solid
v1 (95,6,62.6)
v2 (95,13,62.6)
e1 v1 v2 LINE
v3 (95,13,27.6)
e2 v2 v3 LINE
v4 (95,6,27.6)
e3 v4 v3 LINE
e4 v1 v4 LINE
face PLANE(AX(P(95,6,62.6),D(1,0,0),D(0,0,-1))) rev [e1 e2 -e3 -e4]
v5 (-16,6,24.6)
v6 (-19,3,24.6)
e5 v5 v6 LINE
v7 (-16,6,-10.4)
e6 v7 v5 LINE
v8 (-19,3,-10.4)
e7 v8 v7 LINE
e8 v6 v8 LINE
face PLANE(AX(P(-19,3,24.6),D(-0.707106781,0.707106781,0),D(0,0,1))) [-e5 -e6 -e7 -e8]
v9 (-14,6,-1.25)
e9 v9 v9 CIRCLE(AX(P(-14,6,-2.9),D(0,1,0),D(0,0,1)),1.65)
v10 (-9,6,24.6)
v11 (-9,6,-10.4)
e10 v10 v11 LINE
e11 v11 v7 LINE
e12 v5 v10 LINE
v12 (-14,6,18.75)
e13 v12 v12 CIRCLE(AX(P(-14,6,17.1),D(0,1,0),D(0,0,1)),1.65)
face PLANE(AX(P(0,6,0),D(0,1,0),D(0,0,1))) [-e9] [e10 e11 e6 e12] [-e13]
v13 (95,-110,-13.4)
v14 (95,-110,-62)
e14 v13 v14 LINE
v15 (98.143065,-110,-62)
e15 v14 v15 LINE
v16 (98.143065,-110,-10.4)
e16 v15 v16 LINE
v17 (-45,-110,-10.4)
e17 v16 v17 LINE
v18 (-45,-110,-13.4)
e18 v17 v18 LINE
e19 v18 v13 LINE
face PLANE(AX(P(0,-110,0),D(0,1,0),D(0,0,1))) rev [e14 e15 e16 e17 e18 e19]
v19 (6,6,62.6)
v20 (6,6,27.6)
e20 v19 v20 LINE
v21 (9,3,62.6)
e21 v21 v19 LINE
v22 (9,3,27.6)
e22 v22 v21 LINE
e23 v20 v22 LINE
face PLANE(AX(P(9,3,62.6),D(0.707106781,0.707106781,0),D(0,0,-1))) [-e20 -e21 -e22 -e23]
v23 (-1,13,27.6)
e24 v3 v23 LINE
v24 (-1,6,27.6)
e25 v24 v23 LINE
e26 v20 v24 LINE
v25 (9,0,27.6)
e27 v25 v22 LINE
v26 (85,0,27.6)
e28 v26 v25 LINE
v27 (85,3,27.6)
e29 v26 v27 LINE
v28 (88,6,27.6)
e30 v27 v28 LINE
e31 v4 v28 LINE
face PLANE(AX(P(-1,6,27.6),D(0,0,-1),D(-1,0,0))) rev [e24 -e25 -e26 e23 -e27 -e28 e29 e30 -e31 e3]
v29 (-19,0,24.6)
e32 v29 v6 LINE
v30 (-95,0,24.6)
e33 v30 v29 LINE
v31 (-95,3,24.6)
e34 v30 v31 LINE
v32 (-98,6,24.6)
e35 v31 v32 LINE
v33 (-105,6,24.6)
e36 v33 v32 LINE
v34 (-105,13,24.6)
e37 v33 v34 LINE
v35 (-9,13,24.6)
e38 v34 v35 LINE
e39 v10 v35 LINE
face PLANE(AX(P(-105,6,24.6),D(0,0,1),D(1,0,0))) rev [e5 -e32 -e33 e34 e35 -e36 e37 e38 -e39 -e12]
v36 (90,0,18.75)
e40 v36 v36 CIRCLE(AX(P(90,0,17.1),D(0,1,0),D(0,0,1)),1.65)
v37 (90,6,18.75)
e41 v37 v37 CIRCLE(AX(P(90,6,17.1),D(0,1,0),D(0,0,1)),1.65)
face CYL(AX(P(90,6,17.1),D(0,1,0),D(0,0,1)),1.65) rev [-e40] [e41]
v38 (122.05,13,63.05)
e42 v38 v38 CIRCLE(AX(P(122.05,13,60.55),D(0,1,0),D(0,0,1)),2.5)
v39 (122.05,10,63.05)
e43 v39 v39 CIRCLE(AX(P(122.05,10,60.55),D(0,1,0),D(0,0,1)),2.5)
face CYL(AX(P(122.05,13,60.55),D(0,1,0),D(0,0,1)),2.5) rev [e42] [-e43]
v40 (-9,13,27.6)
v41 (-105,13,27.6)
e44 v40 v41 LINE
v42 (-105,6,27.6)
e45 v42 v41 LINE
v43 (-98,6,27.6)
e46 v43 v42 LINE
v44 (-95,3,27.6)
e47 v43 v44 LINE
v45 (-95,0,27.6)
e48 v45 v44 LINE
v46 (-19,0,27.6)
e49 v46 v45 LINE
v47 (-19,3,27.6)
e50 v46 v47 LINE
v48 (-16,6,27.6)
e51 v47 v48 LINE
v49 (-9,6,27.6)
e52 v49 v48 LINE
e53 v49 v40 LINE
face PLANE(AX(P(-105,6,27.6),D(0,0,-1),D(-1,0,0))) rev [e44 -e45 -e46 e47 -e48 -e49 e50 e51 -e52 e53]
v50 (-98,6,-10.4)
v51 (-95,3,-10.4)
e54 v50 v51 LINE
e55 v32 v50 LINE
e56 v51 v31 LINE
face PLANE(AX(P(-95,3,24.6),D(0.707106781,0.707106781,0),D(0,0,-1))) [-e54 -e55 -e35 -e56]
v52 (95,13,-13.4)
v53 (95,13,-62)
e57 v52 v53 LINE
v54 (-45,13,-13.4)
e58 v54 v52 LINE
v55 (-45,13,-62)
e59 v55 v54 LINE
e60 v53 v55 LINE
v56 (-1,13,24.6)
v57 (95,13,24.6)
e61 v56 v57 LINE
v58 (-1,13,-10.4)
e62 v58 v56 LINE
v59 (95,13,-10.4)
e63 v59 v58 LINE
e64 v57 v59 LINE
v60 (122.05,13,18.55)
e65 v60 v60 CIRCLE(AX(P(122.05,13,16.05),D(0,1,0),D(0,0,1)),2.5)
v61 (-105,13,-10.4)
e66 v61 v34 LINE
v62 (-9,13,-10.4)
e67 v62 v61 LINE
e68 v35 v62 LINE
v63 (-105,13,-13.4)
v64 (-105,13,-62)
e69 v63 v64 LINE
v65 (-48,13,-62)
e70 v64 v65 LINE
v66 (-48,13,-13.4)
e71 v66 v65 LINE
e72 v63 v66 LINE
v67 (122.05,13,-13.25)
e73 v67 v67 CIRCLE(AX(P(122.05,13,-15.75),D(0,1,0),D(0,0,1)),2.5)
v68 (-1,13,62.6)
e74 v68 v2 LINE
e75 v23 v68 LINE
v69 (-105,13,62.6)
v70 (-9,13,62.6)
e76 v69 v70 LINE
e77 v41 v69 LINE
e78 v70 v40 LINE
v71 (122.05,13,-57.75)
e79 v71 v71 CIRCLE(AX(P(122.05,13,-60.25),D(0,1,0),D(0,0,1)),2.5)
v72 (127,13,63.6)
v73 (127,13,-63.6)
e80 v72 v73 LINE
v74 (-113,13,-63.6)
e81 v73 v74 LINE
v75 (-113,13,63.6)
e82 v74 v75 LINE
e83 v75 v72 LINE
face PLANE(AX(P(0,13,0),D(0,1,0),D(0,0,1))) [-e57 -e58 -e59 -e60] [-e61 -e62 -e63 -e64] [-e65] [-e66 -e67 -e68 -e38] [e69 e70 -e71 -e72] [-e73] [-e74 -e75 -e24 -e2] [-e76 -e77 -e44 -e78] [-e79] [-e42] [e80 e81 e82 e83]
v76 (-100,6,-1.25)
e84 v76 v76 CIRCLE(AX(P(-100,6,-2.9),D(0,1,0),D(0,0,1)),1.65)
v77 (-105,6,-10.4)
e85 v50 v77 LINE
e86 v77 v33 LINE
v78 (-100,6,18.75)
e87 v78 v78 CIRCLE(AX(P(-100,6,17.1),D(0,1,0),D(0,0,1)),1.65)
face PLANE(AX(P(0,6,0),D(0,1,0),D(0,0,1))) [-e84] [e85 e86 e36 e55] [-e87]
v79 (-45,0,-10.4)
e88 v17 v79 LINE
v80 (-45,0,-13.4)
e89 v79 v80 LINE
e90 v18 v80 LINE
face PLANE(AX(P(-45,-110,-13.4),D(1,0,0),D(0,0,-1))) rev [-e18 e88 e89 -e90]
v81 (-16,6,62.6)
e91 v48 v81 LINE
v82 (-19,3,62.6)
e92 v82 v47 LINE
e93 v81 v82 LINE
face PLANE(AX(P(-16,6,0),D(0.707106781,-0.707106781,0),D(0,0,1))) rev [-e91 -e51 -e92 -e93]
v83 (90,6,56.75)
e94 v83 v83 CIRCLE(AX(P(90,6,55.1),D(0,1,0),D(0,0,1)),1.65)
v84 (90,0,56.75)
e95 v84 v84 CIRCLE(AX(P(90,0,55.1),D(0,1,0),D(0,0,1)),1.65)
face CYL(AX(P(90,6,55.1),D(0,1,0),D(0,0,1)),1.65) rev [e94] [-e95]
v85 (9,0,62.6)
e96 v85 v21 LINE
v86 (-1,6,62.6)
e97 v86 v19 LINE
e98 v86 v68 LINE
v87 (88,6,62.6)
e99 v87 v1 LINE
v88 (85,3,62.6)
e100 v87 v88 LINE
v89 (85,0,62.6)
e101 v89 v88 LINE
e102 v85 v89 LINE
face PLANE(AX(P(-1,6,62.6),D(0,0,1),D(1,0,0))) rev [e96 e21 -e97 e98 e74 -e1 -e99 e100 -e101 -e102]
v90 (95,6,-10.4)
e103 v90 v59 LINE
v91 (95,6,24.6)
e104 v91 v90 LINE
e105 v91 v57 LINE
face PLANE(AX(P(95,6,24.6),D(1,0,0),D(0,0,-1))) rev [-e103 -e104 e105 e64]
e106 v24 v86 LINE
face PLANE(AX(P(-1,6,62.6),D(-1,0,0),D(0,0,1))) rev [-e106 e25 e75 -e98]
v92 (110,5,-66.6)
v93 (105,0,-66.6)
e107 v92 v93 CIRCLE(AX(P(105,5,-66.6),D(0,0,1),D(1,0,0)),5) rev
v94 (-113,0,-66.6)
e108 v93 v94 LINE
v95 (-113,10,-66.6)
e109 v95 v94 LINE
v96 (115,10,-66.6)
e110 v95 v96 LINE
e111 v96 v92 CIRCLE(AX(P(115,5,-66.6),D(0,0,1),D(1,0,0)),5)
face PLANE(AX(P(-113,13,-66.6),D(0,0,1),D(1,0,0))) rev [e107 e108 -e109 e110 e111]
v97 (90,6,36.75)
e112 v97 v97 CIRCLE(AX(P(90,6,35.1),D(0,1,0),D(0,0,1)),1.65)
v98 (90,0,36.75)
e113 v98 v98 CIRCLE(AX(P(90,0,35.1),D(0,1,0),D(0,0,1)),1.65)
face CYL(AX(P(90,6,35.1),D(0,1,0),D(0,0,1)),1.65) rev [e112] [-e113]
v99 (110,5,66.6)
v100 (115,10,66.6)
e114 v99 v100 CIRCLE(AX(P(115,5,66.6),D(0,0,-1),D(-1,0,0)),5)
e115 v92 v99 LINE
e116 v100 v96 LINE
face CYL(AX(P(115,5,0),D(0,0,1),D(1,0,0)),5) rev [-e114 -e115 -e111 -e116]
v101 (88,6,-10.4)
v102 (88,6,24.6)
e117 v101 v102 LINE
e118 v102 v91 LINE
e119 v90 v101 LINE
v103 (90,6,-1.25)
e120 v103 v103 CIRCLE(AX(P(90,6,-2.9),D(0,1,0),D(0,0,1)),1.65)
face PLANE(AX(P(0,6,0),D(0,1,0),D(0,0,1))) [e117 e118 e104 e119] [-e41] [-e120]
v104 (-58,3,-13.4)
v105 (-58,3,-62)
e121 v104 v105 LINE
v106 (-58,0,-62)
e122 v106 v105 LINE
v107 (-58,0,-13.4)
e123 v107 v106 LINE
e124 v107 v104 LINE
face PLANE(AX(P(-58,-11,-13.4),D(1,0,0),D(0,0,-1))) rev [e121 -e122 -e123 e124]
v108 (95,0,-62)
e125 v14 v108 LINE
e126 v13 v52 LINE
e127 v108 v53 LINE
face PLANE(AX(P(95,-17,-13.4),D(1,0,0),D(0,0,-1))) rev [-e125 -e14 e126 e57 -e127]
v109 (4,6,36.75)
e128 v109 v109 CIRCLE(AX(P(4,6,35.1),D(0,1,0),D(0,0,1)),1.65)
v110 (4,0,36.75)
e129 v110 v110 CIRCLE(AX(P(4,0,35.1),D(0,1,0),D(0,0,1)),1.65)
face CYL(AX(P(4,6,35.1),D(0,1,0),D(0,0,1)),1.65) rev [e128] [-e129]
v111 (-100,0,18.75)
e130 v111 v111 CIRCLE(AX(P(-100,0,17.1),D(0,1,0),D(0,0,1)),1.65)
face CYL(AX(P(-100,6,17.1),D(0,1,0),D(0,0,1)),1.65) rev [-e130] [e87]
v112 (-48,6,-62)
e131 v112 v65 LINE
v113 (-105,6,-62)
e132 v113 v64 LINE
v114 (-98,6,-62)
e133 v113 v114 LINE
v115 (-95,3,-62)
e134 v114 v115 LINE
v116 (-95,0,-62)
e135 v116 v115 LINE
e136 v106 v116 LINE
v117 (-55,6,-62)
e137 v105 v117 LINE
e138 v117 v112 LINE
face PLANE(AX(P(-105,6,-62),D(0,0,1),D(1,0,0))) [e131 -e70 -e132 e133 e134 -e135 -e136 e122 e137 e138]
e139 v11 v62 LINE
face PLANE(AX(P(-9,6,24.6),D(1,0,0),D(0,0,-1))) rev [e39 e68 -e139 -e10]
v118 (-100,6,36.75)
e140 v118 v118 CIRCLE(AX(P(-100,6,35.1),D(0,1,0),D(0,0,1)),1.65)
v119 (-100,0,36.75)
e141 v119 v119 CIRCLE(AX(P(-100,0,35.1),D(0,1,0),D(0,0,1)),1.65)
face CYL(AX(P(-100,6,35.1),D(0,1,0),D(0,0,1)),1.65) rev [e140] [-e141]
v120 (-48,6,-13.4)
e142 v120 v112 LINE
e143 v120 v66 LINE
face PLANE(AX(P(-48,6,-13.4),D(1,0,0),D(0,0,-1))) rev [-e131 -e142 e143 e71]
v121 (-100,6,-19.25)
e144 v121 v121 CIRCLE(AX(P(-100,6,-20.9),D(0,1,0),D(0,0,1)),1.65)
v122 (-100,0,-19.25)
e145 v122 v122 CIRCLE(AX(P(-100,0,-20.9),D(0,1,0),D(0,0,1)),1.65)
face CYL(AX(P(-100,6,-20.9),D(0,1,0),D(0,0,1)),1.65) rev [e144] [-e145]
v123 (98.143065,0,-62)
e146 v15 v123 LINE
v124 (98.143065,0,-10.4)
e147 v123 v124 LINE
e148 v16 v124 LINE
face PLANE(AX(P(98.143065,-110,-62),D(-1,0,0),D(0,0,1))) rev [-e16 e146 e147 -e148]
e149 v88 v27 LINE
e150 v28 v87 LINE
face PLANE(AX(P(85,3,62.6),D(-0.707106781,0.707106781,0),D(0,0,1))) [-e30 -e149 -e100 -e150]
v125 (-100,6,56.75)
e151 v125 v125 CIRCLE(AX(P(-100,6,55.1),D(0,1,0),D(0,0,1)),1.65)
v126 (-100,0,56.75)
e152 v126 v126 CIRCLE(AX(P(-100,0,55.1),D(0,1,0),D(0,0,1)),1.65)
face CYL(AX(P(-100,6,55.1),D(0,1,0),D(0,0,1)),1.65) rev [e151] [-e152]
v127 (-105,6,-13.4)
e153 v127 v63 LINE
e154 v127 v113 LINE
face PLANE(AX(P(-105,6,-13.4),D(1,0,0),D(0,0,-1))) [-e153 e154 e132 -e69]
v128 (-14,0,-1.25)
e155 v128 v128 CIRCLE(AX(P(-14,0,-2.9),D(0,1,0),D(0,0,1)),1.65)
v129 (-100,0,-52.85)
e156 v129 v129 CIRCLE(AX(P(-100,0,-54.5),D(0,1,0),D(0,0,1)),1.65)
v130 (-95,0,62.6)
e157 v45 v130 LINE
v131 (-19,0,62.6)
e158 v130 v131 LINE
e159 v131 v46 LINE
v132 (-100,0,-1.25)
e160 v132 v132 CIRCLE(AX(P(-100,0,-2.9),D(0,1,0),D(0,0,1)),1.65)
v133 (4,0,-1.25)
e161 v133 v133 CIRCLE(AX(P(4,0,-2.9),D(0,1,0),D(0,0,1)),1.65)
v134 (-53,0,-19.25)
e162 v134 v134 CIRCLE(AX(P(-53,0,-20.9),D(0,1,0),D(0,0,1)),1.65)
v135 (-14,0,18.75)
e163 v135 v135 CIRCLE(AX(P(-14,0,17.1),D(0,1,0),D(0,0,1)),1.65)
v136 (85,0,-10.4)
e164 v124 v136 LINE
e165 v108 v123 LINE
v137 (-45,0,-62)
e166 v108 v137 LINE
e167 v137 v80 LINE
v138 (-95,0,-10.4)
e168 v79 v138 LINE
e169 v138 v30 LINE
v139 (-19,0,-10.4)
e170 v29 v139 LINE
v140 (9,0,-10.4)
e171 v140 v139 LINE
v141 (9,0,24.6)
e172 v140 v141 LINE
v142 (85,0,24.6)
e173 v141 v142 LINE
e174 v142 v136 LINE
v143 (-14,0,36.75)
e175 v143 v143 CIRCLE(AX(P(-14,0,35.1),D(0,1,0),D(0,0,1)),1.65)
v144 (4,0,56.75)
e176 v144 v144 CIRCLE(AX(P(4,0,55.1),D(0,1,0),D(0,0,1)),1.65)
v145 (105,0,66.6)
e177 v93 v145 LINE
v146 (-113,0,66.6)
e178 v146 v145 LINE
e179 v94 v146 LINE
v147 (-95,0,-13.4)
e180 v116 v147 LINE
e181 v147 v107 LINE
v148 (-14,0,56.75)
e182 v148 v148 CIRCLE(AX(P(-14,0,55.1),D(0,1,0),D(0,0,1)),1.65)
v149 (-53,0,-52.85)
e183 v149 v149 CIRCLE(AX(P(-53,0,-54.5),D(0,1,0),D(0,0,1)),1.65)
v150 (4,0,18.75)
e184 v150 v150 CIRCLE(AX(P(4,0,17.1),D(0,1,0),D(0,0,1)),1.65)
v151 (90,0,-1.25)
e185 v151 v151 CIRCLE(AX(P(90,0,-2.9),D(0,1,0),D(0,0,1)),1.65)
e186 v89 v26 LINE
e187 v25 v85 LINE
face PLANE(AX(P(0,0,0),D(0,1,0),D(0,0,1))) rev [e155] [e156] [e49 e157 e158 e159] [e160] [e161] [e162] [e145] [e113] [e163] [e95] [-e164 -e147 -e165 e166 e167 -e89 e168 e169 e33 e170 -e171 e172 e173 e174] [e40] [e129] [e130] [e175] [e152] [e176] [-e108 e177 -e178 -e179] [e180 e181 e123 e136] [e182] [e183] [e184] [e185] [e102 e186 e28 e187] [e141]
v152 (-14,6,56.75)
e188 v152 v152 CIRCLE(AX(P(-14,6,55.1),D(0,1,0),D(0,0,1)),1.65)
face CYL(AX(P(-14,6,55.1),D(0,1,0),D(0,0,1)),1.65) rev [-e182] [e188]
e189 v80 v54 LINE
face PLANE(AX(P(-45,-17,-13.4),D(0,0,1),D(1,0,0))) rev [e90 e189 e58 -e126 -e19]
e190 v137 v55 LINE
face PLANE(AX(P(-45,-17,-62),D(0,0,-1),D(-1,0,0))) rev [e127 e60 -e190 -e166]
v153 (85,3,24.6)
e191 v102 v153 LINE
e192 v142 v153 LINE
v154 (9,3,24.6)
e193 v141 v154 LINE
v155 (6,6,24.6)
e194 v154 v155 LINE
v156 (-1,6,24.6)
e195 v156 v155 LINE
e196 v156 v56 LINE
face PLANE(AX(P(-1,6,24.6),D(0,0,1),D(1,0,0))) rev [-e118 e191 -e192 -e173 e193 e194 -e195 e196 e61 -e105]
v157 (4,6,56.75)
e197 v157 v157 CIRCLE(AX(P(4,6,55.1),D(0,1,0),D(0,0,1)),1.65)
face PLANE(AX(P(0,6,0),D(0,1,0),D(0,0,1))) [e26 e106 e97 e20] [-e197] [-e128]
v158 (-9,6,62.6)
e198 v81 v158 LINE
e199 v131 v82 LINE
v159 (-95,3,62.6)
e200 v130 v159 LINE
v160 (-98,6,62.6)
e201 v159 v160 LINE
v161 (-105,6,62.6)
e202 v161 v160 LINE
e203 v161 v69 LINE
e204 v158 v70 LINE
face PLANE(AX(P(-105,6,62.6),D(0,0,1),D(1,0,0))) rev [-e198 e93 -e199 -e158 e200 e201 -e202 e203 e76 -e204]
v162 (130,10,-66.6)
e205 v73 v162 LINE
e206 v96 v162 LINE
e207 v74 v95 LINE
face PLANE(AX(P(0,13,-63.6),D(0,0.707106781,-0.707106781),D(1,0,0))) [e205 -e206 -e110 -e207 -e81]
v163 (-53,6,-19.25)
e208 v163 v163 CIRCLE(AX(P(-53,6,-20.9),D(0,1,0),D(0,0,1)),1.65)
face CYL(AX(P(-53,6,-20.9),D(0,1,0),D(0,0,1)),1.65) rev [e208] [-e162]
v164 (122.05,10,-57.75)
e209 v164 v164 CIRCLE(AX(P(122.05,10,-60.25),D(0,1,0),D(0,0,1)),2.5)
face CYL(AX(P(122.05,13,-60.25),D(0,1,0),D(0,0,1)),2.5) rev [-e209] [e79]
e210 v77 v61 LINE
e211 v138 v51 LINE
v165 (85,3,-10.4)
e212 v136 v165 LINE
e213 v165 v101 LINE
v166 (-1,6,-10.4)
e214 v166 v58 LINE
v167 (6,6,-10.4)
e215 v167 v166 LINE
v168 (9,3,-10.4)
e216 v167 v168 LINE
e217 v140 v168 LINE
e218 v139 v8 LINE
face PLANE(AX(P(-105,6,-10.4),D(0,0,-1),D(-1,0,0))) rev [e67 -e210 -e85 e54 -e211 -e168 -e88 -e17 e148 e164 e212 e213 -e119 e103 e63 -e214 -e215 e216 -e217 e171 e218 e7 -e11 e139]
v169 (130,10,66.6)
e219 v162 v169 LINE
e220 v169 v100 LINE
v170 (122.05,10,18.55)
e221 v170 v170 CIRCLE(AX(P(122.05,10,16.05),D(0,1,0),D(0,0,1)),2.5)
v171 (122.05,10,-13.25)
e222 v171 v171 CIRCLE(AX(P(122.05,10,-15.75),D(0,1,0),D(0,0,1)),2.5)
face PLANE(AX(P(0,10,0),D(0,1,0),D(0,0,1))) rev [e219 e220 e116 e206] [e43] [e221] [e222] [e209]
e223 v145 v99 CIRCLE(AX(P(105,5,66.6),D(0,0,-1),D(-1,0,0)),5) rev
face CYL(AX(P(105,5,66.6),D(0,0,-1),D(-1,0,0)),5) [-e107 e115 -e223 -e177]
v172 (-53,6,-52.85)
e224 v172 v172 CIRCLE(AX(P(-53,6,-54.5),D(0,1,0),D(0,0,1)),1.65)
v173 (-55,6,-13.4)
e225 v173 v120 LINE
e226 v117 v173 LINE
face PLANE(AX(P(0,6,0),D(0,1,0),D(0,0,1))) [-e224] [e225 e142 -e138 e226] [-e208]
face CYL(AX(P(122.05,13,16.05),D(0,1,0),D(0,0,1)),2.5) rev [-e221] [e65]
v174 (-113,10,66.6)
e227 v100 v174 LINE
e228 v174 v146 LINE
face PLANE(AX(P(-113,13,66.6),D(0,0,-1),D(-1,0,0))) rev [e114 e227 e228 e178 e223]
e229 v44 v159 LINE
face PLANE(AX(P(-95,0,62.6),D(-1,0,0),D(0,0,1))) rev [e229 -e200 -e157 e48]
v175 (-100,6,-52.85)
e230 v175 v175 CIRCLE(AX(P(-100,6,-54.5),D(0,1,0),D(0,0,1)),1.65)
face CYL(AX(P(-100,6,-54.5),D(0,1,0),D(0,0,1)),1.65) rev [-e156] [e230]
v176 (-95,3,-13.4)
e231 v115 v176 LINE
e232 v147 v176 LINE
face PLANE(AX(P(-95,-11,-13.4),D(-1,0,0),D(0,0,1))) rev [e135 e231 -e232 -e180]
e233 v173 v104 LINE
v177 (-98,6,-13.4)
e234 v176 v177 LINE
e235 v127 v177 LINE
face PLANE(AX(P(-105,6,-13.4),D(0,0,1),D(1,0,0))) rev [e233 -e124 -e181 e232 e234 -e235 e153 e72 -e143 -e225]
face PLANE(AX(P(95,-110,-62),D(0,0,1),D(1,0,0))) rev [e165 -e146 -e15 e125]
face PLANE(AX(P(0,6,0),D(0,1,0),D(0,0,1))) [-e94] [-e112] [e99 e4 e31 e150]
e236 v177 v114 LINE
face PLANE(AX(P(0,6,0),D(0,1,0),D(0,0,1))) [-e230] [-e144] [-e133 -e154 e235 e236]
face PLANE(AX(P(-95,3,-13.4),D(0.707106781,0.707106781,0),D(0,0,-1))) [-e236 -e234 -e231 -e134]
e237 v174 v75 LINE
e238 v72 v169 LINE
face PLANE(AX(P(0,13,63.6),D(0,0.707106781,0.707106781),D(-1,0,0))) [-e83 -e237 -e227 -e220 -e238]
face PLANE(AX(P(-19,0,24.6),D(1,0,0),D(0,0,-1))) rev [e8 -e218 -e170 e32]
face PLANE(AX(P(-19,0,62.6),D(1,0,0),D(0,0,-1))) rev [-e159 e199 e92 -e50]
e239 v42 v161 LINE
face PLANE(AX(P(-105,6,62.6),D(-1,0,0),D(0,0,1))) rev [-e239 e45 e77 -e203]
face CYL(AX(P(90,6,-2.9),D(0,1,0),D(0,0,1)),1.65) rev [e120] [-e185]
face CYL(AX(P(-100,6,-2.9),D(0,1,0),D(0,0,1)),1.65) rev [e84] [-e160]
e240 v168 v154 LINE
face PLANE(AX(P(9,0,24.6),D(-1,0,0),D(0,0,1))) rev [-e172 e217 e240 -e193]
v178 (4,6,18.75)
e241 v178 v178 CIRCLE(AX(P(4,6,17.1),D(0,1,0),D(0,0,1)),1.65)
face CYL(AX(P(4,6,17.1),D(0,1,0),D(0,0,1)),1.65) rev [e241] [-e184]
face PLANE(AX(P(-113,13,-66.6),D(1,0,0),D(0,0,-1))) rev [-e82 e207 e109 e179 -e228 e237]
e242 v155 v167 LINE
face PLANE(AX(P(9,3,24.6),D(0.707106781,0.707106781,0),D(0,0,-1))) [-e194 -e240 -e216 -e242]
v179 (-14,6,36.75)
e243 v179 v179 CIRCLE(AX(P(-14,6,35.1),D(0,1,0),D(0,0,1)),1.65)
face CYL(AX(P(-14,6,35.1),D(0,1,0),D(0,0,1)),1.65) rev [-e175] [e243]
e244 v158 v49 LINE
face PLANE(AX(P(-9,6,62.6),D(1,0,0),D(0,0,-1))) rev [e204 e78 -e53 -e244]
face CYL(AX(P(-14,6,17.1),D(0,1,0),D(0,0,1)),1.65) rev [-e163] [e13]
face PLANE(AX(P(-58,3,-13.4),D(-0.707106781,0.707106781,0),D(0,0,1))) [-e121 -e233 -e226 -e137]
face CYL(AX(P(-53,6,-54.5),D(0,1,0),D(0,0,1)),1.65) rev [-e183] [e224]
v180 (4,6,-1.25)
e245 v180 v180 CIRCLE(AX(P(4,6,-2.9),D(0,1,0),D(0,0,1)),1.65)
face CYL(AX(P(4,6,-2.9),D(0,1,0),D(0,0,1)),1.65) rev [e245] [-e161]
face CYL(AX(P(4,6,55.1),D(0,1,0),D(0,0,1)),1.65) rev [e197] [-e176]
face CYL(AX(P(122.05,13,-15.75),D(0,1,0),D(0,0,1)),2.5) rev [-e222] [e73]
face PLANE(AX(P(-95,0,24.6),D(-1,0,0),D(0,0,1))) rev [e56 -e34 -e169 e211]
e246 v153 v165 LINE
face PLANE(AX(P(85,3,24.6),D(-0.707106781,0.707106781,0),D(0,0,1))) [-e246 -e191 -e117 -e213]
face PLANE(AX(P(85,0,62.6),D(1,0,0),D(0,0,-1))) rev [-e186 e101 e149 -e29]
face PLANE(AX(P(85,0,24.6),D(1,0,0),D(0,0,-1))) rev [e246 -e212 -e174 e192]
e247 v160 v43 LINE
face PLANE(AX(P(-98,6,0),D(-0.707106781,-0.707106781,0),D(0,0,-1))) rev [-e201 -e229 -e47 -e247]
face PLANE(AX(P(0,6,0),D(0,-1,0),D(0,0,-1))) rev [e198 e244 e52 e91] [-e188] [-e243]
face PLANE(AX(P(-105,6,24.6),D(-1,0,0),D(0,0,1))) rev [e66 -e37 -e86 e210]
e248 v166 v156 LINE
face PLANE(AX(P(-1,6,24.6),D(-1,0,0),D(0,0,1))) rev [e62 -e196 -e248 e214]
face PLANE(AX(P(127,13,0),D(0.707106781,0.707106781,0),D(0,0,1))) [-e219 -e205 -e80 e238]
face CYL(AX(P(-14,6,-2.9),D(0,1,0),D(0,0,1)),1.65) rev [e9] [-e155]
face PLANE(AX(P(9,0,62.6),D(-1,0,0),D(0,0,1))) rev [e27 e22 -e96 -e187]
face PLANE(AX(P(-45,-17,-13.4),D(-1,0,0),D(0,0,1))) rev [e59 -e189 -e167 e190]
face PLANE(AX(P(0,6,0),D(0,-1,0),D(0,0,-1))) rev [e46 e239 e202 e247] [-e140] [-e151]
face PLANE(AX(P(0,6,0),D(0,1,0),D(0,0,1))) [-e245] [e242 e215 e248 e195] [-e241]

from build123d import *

# Parameters (mm, degrees)
SKETCH1_W                      = 243
SKETCH1_H                      = 133.2
BOSS_EXTRUDE1_DEPTH            = 13
SKETCH32_W                     = 20
SKETCH32_H                     = 133.2
CUT_EXTRUDE10_DEPTH            = 10
FILLET1_START                  = -68
FILLET1_DEPTH                  = 136
FILLET1_START_2                = -66.6
FILLET1_2_DEPTH                = 133.2
M6X1_0_TAPPED_HOLE1_D          = 5
M6X1_0_TAPPED_HOLE1_DEPTH      = 15
M6X1_0_TAPPED_HOLE1_TIP        = 1.502151548
SKETCH36_W                     = 96
SKETCH36_H                     = 35
CUT_EXTRUDE11_DEPTH            = 7
SKETCH37_W                     = 76
SKETCH37_H                     = 35
CUT_EXTRUDE12_DEPTH            = 147.644331633
M4X0_7_TAPPED_HOLE1_AT_2_COUNT = 2
M4X0_7_TAPPED_HOLE1_AT_2_PITCH = 20
M4X0_7_TAPPED_HOLE1_AT_3_COUNT = 2
M4X0_7_TAPPED_HOLE1_AT_3_PITCH = 86
M4X0_7_TAPPED_HOLE1_AT_4_COUNT = 2
M4X0_7_TAPPED_HOLE1_AT_4_PITCH = 88.294960219
LPATTERN1_COUNT                = 2
LPATTERN1_PITCH                = 38
LPATTERN1_COUNT_DIR2           = 2
LPATTERN1_PITCH_DIR2           = 104
CHAMFER1_SIZE                  = 3
SKETCH41_W                     = 140
SKETCH41_H                     = 48.6
CUT_EXTRUDE13_DEPTH            = 30
BOSS_EXTRUDE2_DEPTH            = 110
SKETCH43_W                     = 57
SKETCH43_H                     = 48.6
CUT_EXTRUDE14_DEPTH            = 7
SKETCH44_W                     = 37
SKETCH44_H                     = 48.6
CUT_EXTRUDE15_DEPTH            = 17
CHAMFER2_SIZE                  = 3
M4X0_7_TAPPED_HOLE2_D          = 3.3
M4X0_7_TAPPED_HOLE2_DEPTH      = 10.1
M4X0_7_TAPPED_HOLE2_TIP        = 0.991420021


with BuildPart() as part:
    # Sketch1 → Boss-Extrude1 (new body)
    with BuildSketch(Plane(origin=(0, 0, 0), x_dir=(1, 0, 0), z_dir=(0, 1, 0))):
        with Locations((8.5, 0)):
            Rectangle(SKETCH1_W, SKETCH1_H)
    extrude(amount=BOSS_EXTRUDE1_DEPTH)

    # Sketch32 → Cut-Extrude10 (cut)
    with BuildSketch(Plane.XZ):
        with Locations((120, 0)):
            Rectangle(SKETCH32_W, SKETCH32_H)
    extrude(amount=-CUT_EXTRUDE10_DEPTH, mode=Mode.SUBTRACT)

    # Fillet1: read off the stored shape, not the designer's step
    # Fillet1 outline → Fillet1 (cut)
    with BuildSketch(Plane.XY.offset(FILLET1_START)):
        with BuildLine():
            Line((110, 0), (110, 5))
            ThreePointArc((110, 5), (108.535533906, 1.464466094), (105, 0))
            Line((105, 0), (110, 0))
        make_face()
    extrude(amount=FILLET1_DEPTH, mode=Mode.SUBTRACT)

    # Fillet1 2 outline → Fillet1 2 (add)
    with BuildSketch(Plane.XY.offset(FILLET1_START_2)):
        with BuildLine():
            ThreePointArc((110, 5), (111.464466094, 8.535533906), (115, 10))
            Line((115, 10), (110, 10))
            Line((110, 10), (110, 5))
        make_face()
    extrude(amount=FILLET1_2_DEPTH)

    # M6x1.0 Tapped Hole1
    with Locations(Plane(origin=(0, 13, 0), x_dir=(1, 0, 0), z_dir=(0, 1, 0))):
        with Locations((122.05, 60.25), (122.05, 15.75), (122.05, -16.05), (122.05, -60.55)):
            Hole(M6X1_0_TAPPED_HOLE1_D / 2, depth=M6X1_0_TAPPED_HOLE1_DEPTH)
            with Locations((0, 0, -(M6X1_0_TAPPED_HOLE1_DEPTH + M6X1_0_TAPPED_HOLE1_TIP / 2))):  # 118° drill point
                Cone(0, M6X1_0_TAPPED_HOLE1_D / 2, M6X1_0_TAPPED_HOLE1_TIP, mode=Mode.SUBTRACT)

    # Sketch36 → Cut-Extrude11 (cut)
    with BuildSketch(Plane(origin=(0, 13, 0), x_dir=(1, 0, 0), z_dir=(0, 1, 0))):
        with Locations((-57, -45.1)):
            Rectangle(SKETCH36_W, SKETCH36_H)
        with Locations((-57, -7.1)):
            Rectangle(SKETCH36_W, SKETCH36_H)
        with Locations((47, -7.1)):
            Rectangle(SKETCH36_W, SKETCH36_H)
        with Locations((47, -45.1)):
            Rectangle(SKETCH36_W, SKETCH36_H)
    extrude(amount=-CUT_EXTRUDE11_DEPTH, mode=Mode.SUBTRACT)

    # Sketch37 → Cut-Extrude12 (cut, through all)
    with BuildSketch(Plane(origin=(0, 13, 0), x_dir=(1, 0, 0), z_dir=(0, 1, 0))):
        with Locations((-57, -45.1)):
            Rectangle(SKETCH37_W, SKETCH37_H)
        with Locations((-57, -7.1)):
            Rectangle(SKETCH37_W, SKETCH37_H)
        with Locations((47, -7.1)):
            Rectangle(SKETCH37_W, SKETCH37_H)
        with Locations((47, -45.1)):
            Rectangle(SKETCH37_W, SKETCH37_H)
    extrude(amount=-CUT_EXTRUDE12_DEPTH, mode=Mode.SUBTRACT)

    # Sketch39 → M4x0.7 Tapped Hole1 (revolve, cut)
    with BuildSketch(Plane(origin=(-100, 6, 55.1), x_dir=(0, 0, 1), z_dir=(1, 0, 0))):
        Polygon((0, 0), (0, 11.091420021), (1.65, 10.1), (1.65, 0), align=None)
    m4x0_7_tapped_hole1 = revolve(axis=Axis((-100, 12.35, 55.1), (0, -1, 0)), mode=Mode.SUBTRACT)

    # M4x0.7 Tapped Hole1 at 2: M4x0.7 Tapped Hole1 ×2
    with Locations(*[(0, 0, -i * M4X0_7_TAPPED_HOLE1_AT_2_PITCH) for i in range(1, M4X0_7_TAPPED_HOLE1_AT_2_COUNT)]):
        add(m4x0_7_tapped_hole1, mode=Mode.SUBTRACT)

    # M4x0.7 Tapped Hole1 at 3: M4x0.7 Tapped Hole1 ×2
    with Locations(*[(i * M4X0_7_TAPPED_HOLE1_AT_3_PITCH, 0, 0) for i in range(1, M4X0_7_TAPPED_HOLE1_AT_3_COUNT)]):
        add(m4x0_7_tapped_hole1, mode=Mode.SUBTRACT)

    # M4x0.7 Tapped Hole1 at 4: M4x0.7 Tapped Hole1 ×2
    with Locations(*[Vector(0.9740080270391964, 0, -0.2265134946602783) * (i * M4X0_7_TAPPED_HOLE1_AT_4_PITCH) for i in range(1, M4X0_7_TAPPED_HOLE1_AT_4_COUNT)]):
        add(m4x0_7_tapped_hole1, mode=Mode.SUBTRACT)

    # LPattern1: M4x0.7 Tapped Hole1 2 × 2
    with Locations(*[(j * LPATTERN1_PITCH_DIR2, 0, -i * LPATTERN1_PITCH) for i in range(LPATTERN1_COUNT) for j in range(LPATTERN1_COUNT_DIR2) if (i, j) != (0, 0)]):
        add(m4x0_7_tapped_hole1, mode=Mode.SUBTRACT)

    # LPattern1 copy 1 sketch → LPattern1 copy 1 (revolve, cut)
    with BuildSketch(Plane(origin=(4, 6, 35.1), x_dir=(0, 0, 1), z_dir=(1, 0, 0))):
        Polygon((0, 0), (0, 11.091420021), (1.65, 10.1), (1.65, 0), align=None)
    revolve(axis=Axis((4, 12.35, 35.1), (0, -1, 0)), mode=Mode.SUBTRACT)

    # LPattern1 copy 2 sketch → LPattern1 copy 2 (revolve, cut)
    with BuildSketch(Plane(origin=(-100, 6, -2.9), x_dir=(0, 0, 1), z_dir=(1, 0, 0))):
        Polygon((0, 0), (0, 11.091420021), (1.65, 10.1), (1.65, 0), align=None)
    revolve(axis=Axis((-100, 12.35, -2.9), (0, -1, 0)), mode=Mode.SUBTRACT)

    # LPattern1 copy 3 sketch → LPattern1 copy 3 (revolve, cut)
    with BuildSketch(Plane(origin=(4, 6, -2.9), x_dir=(0, 0, 1), z_dir=(1, 0, 0))):
        Polygon((0, 0), (0, 11.091420021), (1.65, 10.1), (1.65, 0), align=None)
    revolve(axis=Axis((4, 12.35, -2.9), (0, -1, 0)), mode=Mode.SUBTRACT)

    # LPattern1 copy 4 sketch → LPattern1 copy 4 (revolve, cut)
    with BuildSketch(Plane(origin=(90, 6, 55.1), x_dir=(0, 0, 1), z_dir=(1, 0, 0))):
        Polygon((0, 0), (0, 11.091420021), (1.65, 10.1), (1.65, 0), align=None)
    revolve(axis=Axis((90, 12.35, 55.1), (0, -1, 0)), mode=Mode.SUBTRACT)

    # LPattern1 copy 5 sketch → LPattern1 copy 5 (revolve, cut)
    with BuildSketch(Plane(origin=(-14, 6, 17.1), x_dir=(0, 0, 1), z_dir=(1, 0, 0))):
        Polygon((0, 0), (0, 11.091420021), (1.65, 10.1), (1.65, 0), align=None)
    revolve(axis=Axis((-14, 12.35, 17.1), (0, -1, 0)), mode=Mode.SUBTRACT)

    # LPattern1 copy 6 sketch → LPattern1 copy 6 (revolve, cut)
    with BuildSketch(Plane(origin=(90, 6, 17.1), x_dir=(0, 0, 1), z_dir=(1, 0, 0))):
        Polygon((0, 0), (0, 11.091420021), (1.65, 10.1), (1.65, 0), align=None)
    revolve(axis=Axis((90, 12.35, 17.1), (0, -1, 0)), mode=Mode.SUBTRACT)

    # LPattern1 copy 7 sketch → LPattern1 copy 7 (revolve, cut)
    with BuildSketch(Plane(origin=(90, 6, 35.1), x_dir=(0, 0, 1), z_dir=(1, 0, 0))):
        Polygon((0, 0), (0, 11.091420021), (1.65, 10.1), (1.65, 0), align=None)
    revolve(axis=Axis((90, 12.35, 35.1), (0, -1, 0)), mode=Mode.SUBTRACT)

    # LPattern1 copy 8 sketch → LPattern1 copy 8 (revolve, cut)
    with BuildSketch(Plane(origin=(-14, 6, -2.9), x_dir=(0, 0, 1), z_dir=(1, 0, 0))):
        Polygon((0, 0), (0, 11.091420021), (1.65, 10.1), (1.65, 0), align=None)
    revolve(axis=Axis((-14, 12.35, -2.9), (0, -1, 0)), mode=Mode.SUBTRACT)

    # LPattern1 copy 9 sketch → LPattern1 copy 9 (revolve, cut)
    with BuildSketch(Plane(origin=(90, 6, -2.9), x_dir=(0, 0, 1), z_dir=(1, 0, 0))):
        Polygon((0, 0), (0, 11.091420021), (1.65, 10.1), (1.65, 0), align=None)
    revolve(axis=Axis((90, 12.35, -2.9), (0, -1, 0)), mode=Mode.SUBTRACT)

    # Chamfer1
    chamfer1_edges = [part.edges().sort_by_distance(p)[0] for p in [
        (-95, 6, 7.1),
        (-19, 6, 7.1),
        (-19, 6, 45.1),
        (-95, 6, 45.1),
        (85, 6, 7.1),
        (9, 6, 7.1),
        (9, 6, 45.1),
        (85, 6, 45.1),
        (8.5, 13, -66.6),
        (130, 13, 0),
        (8.5, 13, 66.6),
    ]]
    chamfer(chamfer1_edges, length=CHAMFER1_SIZE - 0.0001)  # a hair under: the kernel refuses the full size

    # Sketch41 → Cut-Extrude13 (cut)
    with BuildSketch(Plane(origin=(0, 13, 0), x_dir=(1, 0, 0), z_dir=(0, 1, 0))):
        with Locations((25, 37.7)):
            Rectangle(SKETCH41_W, SKETCH41_H)
    extrude(amount=-CUT_EXTRUDE13_DEPTH, mode=Mode.SUBTRACT)

    # Sketch42 → Boss-Extrude2 (add)
    with BuildSketch(Plane.XZ):
        Polygon((-45, -13.4), (95, -13.4), (95, -62), (98.143065291, -62), (98.143065291, -10.4), (95, -10.4), (-45, -10.4), align=None)
    extrude(amount=BOSS_EXTRUDE2_DEPTH)

    # Sketch43 → Cut-Extrude14 (cut)
    with BuildSketch(Plane(origin=(0, 13, 0), x_dir=(1, 0, 0), z_dir=(0, 1, 0))):
        with Locations((-76.5, 37.7)):
            Rectangle(SKETCH43_W, SKETCH43_H)
    extrude(amount=-CUT_EXTRUDE14_DEPTH, mode=Mode.SUBTRACT)

    # Sketch44 → Cut-Extrude15 (cut)
    with BuildSketch(Plane(origin=(0, 6, 0), x_dir=(1, 0, 0), z_dir=(0, 1, 0))):
        with Locations((-76.5, 37.7)):
            Rectangle(SKETCH44_W, SKETCH44_H)
    extrude(amount=-CUT_EXTRUDE15_DEPTH, mode=Mode.SUBTRACT)

    # Chamfer2
    chamfer2_edges = [part.edges().sort_by_distance(p)[0] for p in [
        (-95, 6, -37.7),
        (-58, 6, -37.7),
    ]]
    chamfer(chamfer2_edges, length=CHAMFER2_SIZE)

    # M4x0.7 Tapped Hole2
    with Locations(Plane(origin=(0, 6, 0), x_dir=(1, 0, 0), z_dir=(0, 1, 0))):
        with Locations((-100, 20.9), (-100, 54.5), (-53, 54.5), (-53, 20.9)):
            Hole(M4X0_7_TAPPED_HOLE2_D / 2, depth=M4X0_7_TAPPED_HOLE2_DEPTH)
            with Locations((0, 0, -(M4X0_7_TAPPED_HOLE2_DEPTH + M4X0_7_TAPPED_HOLE2_TIP / 2))):  # 118° drill point
                Cone(0, M4X0_7_TAPPED_HOLE2_D / 2, M4X0_7_TAPPED_HOLE2_TIP, mode=Mode.SUBTRACT)


solid = part.part
